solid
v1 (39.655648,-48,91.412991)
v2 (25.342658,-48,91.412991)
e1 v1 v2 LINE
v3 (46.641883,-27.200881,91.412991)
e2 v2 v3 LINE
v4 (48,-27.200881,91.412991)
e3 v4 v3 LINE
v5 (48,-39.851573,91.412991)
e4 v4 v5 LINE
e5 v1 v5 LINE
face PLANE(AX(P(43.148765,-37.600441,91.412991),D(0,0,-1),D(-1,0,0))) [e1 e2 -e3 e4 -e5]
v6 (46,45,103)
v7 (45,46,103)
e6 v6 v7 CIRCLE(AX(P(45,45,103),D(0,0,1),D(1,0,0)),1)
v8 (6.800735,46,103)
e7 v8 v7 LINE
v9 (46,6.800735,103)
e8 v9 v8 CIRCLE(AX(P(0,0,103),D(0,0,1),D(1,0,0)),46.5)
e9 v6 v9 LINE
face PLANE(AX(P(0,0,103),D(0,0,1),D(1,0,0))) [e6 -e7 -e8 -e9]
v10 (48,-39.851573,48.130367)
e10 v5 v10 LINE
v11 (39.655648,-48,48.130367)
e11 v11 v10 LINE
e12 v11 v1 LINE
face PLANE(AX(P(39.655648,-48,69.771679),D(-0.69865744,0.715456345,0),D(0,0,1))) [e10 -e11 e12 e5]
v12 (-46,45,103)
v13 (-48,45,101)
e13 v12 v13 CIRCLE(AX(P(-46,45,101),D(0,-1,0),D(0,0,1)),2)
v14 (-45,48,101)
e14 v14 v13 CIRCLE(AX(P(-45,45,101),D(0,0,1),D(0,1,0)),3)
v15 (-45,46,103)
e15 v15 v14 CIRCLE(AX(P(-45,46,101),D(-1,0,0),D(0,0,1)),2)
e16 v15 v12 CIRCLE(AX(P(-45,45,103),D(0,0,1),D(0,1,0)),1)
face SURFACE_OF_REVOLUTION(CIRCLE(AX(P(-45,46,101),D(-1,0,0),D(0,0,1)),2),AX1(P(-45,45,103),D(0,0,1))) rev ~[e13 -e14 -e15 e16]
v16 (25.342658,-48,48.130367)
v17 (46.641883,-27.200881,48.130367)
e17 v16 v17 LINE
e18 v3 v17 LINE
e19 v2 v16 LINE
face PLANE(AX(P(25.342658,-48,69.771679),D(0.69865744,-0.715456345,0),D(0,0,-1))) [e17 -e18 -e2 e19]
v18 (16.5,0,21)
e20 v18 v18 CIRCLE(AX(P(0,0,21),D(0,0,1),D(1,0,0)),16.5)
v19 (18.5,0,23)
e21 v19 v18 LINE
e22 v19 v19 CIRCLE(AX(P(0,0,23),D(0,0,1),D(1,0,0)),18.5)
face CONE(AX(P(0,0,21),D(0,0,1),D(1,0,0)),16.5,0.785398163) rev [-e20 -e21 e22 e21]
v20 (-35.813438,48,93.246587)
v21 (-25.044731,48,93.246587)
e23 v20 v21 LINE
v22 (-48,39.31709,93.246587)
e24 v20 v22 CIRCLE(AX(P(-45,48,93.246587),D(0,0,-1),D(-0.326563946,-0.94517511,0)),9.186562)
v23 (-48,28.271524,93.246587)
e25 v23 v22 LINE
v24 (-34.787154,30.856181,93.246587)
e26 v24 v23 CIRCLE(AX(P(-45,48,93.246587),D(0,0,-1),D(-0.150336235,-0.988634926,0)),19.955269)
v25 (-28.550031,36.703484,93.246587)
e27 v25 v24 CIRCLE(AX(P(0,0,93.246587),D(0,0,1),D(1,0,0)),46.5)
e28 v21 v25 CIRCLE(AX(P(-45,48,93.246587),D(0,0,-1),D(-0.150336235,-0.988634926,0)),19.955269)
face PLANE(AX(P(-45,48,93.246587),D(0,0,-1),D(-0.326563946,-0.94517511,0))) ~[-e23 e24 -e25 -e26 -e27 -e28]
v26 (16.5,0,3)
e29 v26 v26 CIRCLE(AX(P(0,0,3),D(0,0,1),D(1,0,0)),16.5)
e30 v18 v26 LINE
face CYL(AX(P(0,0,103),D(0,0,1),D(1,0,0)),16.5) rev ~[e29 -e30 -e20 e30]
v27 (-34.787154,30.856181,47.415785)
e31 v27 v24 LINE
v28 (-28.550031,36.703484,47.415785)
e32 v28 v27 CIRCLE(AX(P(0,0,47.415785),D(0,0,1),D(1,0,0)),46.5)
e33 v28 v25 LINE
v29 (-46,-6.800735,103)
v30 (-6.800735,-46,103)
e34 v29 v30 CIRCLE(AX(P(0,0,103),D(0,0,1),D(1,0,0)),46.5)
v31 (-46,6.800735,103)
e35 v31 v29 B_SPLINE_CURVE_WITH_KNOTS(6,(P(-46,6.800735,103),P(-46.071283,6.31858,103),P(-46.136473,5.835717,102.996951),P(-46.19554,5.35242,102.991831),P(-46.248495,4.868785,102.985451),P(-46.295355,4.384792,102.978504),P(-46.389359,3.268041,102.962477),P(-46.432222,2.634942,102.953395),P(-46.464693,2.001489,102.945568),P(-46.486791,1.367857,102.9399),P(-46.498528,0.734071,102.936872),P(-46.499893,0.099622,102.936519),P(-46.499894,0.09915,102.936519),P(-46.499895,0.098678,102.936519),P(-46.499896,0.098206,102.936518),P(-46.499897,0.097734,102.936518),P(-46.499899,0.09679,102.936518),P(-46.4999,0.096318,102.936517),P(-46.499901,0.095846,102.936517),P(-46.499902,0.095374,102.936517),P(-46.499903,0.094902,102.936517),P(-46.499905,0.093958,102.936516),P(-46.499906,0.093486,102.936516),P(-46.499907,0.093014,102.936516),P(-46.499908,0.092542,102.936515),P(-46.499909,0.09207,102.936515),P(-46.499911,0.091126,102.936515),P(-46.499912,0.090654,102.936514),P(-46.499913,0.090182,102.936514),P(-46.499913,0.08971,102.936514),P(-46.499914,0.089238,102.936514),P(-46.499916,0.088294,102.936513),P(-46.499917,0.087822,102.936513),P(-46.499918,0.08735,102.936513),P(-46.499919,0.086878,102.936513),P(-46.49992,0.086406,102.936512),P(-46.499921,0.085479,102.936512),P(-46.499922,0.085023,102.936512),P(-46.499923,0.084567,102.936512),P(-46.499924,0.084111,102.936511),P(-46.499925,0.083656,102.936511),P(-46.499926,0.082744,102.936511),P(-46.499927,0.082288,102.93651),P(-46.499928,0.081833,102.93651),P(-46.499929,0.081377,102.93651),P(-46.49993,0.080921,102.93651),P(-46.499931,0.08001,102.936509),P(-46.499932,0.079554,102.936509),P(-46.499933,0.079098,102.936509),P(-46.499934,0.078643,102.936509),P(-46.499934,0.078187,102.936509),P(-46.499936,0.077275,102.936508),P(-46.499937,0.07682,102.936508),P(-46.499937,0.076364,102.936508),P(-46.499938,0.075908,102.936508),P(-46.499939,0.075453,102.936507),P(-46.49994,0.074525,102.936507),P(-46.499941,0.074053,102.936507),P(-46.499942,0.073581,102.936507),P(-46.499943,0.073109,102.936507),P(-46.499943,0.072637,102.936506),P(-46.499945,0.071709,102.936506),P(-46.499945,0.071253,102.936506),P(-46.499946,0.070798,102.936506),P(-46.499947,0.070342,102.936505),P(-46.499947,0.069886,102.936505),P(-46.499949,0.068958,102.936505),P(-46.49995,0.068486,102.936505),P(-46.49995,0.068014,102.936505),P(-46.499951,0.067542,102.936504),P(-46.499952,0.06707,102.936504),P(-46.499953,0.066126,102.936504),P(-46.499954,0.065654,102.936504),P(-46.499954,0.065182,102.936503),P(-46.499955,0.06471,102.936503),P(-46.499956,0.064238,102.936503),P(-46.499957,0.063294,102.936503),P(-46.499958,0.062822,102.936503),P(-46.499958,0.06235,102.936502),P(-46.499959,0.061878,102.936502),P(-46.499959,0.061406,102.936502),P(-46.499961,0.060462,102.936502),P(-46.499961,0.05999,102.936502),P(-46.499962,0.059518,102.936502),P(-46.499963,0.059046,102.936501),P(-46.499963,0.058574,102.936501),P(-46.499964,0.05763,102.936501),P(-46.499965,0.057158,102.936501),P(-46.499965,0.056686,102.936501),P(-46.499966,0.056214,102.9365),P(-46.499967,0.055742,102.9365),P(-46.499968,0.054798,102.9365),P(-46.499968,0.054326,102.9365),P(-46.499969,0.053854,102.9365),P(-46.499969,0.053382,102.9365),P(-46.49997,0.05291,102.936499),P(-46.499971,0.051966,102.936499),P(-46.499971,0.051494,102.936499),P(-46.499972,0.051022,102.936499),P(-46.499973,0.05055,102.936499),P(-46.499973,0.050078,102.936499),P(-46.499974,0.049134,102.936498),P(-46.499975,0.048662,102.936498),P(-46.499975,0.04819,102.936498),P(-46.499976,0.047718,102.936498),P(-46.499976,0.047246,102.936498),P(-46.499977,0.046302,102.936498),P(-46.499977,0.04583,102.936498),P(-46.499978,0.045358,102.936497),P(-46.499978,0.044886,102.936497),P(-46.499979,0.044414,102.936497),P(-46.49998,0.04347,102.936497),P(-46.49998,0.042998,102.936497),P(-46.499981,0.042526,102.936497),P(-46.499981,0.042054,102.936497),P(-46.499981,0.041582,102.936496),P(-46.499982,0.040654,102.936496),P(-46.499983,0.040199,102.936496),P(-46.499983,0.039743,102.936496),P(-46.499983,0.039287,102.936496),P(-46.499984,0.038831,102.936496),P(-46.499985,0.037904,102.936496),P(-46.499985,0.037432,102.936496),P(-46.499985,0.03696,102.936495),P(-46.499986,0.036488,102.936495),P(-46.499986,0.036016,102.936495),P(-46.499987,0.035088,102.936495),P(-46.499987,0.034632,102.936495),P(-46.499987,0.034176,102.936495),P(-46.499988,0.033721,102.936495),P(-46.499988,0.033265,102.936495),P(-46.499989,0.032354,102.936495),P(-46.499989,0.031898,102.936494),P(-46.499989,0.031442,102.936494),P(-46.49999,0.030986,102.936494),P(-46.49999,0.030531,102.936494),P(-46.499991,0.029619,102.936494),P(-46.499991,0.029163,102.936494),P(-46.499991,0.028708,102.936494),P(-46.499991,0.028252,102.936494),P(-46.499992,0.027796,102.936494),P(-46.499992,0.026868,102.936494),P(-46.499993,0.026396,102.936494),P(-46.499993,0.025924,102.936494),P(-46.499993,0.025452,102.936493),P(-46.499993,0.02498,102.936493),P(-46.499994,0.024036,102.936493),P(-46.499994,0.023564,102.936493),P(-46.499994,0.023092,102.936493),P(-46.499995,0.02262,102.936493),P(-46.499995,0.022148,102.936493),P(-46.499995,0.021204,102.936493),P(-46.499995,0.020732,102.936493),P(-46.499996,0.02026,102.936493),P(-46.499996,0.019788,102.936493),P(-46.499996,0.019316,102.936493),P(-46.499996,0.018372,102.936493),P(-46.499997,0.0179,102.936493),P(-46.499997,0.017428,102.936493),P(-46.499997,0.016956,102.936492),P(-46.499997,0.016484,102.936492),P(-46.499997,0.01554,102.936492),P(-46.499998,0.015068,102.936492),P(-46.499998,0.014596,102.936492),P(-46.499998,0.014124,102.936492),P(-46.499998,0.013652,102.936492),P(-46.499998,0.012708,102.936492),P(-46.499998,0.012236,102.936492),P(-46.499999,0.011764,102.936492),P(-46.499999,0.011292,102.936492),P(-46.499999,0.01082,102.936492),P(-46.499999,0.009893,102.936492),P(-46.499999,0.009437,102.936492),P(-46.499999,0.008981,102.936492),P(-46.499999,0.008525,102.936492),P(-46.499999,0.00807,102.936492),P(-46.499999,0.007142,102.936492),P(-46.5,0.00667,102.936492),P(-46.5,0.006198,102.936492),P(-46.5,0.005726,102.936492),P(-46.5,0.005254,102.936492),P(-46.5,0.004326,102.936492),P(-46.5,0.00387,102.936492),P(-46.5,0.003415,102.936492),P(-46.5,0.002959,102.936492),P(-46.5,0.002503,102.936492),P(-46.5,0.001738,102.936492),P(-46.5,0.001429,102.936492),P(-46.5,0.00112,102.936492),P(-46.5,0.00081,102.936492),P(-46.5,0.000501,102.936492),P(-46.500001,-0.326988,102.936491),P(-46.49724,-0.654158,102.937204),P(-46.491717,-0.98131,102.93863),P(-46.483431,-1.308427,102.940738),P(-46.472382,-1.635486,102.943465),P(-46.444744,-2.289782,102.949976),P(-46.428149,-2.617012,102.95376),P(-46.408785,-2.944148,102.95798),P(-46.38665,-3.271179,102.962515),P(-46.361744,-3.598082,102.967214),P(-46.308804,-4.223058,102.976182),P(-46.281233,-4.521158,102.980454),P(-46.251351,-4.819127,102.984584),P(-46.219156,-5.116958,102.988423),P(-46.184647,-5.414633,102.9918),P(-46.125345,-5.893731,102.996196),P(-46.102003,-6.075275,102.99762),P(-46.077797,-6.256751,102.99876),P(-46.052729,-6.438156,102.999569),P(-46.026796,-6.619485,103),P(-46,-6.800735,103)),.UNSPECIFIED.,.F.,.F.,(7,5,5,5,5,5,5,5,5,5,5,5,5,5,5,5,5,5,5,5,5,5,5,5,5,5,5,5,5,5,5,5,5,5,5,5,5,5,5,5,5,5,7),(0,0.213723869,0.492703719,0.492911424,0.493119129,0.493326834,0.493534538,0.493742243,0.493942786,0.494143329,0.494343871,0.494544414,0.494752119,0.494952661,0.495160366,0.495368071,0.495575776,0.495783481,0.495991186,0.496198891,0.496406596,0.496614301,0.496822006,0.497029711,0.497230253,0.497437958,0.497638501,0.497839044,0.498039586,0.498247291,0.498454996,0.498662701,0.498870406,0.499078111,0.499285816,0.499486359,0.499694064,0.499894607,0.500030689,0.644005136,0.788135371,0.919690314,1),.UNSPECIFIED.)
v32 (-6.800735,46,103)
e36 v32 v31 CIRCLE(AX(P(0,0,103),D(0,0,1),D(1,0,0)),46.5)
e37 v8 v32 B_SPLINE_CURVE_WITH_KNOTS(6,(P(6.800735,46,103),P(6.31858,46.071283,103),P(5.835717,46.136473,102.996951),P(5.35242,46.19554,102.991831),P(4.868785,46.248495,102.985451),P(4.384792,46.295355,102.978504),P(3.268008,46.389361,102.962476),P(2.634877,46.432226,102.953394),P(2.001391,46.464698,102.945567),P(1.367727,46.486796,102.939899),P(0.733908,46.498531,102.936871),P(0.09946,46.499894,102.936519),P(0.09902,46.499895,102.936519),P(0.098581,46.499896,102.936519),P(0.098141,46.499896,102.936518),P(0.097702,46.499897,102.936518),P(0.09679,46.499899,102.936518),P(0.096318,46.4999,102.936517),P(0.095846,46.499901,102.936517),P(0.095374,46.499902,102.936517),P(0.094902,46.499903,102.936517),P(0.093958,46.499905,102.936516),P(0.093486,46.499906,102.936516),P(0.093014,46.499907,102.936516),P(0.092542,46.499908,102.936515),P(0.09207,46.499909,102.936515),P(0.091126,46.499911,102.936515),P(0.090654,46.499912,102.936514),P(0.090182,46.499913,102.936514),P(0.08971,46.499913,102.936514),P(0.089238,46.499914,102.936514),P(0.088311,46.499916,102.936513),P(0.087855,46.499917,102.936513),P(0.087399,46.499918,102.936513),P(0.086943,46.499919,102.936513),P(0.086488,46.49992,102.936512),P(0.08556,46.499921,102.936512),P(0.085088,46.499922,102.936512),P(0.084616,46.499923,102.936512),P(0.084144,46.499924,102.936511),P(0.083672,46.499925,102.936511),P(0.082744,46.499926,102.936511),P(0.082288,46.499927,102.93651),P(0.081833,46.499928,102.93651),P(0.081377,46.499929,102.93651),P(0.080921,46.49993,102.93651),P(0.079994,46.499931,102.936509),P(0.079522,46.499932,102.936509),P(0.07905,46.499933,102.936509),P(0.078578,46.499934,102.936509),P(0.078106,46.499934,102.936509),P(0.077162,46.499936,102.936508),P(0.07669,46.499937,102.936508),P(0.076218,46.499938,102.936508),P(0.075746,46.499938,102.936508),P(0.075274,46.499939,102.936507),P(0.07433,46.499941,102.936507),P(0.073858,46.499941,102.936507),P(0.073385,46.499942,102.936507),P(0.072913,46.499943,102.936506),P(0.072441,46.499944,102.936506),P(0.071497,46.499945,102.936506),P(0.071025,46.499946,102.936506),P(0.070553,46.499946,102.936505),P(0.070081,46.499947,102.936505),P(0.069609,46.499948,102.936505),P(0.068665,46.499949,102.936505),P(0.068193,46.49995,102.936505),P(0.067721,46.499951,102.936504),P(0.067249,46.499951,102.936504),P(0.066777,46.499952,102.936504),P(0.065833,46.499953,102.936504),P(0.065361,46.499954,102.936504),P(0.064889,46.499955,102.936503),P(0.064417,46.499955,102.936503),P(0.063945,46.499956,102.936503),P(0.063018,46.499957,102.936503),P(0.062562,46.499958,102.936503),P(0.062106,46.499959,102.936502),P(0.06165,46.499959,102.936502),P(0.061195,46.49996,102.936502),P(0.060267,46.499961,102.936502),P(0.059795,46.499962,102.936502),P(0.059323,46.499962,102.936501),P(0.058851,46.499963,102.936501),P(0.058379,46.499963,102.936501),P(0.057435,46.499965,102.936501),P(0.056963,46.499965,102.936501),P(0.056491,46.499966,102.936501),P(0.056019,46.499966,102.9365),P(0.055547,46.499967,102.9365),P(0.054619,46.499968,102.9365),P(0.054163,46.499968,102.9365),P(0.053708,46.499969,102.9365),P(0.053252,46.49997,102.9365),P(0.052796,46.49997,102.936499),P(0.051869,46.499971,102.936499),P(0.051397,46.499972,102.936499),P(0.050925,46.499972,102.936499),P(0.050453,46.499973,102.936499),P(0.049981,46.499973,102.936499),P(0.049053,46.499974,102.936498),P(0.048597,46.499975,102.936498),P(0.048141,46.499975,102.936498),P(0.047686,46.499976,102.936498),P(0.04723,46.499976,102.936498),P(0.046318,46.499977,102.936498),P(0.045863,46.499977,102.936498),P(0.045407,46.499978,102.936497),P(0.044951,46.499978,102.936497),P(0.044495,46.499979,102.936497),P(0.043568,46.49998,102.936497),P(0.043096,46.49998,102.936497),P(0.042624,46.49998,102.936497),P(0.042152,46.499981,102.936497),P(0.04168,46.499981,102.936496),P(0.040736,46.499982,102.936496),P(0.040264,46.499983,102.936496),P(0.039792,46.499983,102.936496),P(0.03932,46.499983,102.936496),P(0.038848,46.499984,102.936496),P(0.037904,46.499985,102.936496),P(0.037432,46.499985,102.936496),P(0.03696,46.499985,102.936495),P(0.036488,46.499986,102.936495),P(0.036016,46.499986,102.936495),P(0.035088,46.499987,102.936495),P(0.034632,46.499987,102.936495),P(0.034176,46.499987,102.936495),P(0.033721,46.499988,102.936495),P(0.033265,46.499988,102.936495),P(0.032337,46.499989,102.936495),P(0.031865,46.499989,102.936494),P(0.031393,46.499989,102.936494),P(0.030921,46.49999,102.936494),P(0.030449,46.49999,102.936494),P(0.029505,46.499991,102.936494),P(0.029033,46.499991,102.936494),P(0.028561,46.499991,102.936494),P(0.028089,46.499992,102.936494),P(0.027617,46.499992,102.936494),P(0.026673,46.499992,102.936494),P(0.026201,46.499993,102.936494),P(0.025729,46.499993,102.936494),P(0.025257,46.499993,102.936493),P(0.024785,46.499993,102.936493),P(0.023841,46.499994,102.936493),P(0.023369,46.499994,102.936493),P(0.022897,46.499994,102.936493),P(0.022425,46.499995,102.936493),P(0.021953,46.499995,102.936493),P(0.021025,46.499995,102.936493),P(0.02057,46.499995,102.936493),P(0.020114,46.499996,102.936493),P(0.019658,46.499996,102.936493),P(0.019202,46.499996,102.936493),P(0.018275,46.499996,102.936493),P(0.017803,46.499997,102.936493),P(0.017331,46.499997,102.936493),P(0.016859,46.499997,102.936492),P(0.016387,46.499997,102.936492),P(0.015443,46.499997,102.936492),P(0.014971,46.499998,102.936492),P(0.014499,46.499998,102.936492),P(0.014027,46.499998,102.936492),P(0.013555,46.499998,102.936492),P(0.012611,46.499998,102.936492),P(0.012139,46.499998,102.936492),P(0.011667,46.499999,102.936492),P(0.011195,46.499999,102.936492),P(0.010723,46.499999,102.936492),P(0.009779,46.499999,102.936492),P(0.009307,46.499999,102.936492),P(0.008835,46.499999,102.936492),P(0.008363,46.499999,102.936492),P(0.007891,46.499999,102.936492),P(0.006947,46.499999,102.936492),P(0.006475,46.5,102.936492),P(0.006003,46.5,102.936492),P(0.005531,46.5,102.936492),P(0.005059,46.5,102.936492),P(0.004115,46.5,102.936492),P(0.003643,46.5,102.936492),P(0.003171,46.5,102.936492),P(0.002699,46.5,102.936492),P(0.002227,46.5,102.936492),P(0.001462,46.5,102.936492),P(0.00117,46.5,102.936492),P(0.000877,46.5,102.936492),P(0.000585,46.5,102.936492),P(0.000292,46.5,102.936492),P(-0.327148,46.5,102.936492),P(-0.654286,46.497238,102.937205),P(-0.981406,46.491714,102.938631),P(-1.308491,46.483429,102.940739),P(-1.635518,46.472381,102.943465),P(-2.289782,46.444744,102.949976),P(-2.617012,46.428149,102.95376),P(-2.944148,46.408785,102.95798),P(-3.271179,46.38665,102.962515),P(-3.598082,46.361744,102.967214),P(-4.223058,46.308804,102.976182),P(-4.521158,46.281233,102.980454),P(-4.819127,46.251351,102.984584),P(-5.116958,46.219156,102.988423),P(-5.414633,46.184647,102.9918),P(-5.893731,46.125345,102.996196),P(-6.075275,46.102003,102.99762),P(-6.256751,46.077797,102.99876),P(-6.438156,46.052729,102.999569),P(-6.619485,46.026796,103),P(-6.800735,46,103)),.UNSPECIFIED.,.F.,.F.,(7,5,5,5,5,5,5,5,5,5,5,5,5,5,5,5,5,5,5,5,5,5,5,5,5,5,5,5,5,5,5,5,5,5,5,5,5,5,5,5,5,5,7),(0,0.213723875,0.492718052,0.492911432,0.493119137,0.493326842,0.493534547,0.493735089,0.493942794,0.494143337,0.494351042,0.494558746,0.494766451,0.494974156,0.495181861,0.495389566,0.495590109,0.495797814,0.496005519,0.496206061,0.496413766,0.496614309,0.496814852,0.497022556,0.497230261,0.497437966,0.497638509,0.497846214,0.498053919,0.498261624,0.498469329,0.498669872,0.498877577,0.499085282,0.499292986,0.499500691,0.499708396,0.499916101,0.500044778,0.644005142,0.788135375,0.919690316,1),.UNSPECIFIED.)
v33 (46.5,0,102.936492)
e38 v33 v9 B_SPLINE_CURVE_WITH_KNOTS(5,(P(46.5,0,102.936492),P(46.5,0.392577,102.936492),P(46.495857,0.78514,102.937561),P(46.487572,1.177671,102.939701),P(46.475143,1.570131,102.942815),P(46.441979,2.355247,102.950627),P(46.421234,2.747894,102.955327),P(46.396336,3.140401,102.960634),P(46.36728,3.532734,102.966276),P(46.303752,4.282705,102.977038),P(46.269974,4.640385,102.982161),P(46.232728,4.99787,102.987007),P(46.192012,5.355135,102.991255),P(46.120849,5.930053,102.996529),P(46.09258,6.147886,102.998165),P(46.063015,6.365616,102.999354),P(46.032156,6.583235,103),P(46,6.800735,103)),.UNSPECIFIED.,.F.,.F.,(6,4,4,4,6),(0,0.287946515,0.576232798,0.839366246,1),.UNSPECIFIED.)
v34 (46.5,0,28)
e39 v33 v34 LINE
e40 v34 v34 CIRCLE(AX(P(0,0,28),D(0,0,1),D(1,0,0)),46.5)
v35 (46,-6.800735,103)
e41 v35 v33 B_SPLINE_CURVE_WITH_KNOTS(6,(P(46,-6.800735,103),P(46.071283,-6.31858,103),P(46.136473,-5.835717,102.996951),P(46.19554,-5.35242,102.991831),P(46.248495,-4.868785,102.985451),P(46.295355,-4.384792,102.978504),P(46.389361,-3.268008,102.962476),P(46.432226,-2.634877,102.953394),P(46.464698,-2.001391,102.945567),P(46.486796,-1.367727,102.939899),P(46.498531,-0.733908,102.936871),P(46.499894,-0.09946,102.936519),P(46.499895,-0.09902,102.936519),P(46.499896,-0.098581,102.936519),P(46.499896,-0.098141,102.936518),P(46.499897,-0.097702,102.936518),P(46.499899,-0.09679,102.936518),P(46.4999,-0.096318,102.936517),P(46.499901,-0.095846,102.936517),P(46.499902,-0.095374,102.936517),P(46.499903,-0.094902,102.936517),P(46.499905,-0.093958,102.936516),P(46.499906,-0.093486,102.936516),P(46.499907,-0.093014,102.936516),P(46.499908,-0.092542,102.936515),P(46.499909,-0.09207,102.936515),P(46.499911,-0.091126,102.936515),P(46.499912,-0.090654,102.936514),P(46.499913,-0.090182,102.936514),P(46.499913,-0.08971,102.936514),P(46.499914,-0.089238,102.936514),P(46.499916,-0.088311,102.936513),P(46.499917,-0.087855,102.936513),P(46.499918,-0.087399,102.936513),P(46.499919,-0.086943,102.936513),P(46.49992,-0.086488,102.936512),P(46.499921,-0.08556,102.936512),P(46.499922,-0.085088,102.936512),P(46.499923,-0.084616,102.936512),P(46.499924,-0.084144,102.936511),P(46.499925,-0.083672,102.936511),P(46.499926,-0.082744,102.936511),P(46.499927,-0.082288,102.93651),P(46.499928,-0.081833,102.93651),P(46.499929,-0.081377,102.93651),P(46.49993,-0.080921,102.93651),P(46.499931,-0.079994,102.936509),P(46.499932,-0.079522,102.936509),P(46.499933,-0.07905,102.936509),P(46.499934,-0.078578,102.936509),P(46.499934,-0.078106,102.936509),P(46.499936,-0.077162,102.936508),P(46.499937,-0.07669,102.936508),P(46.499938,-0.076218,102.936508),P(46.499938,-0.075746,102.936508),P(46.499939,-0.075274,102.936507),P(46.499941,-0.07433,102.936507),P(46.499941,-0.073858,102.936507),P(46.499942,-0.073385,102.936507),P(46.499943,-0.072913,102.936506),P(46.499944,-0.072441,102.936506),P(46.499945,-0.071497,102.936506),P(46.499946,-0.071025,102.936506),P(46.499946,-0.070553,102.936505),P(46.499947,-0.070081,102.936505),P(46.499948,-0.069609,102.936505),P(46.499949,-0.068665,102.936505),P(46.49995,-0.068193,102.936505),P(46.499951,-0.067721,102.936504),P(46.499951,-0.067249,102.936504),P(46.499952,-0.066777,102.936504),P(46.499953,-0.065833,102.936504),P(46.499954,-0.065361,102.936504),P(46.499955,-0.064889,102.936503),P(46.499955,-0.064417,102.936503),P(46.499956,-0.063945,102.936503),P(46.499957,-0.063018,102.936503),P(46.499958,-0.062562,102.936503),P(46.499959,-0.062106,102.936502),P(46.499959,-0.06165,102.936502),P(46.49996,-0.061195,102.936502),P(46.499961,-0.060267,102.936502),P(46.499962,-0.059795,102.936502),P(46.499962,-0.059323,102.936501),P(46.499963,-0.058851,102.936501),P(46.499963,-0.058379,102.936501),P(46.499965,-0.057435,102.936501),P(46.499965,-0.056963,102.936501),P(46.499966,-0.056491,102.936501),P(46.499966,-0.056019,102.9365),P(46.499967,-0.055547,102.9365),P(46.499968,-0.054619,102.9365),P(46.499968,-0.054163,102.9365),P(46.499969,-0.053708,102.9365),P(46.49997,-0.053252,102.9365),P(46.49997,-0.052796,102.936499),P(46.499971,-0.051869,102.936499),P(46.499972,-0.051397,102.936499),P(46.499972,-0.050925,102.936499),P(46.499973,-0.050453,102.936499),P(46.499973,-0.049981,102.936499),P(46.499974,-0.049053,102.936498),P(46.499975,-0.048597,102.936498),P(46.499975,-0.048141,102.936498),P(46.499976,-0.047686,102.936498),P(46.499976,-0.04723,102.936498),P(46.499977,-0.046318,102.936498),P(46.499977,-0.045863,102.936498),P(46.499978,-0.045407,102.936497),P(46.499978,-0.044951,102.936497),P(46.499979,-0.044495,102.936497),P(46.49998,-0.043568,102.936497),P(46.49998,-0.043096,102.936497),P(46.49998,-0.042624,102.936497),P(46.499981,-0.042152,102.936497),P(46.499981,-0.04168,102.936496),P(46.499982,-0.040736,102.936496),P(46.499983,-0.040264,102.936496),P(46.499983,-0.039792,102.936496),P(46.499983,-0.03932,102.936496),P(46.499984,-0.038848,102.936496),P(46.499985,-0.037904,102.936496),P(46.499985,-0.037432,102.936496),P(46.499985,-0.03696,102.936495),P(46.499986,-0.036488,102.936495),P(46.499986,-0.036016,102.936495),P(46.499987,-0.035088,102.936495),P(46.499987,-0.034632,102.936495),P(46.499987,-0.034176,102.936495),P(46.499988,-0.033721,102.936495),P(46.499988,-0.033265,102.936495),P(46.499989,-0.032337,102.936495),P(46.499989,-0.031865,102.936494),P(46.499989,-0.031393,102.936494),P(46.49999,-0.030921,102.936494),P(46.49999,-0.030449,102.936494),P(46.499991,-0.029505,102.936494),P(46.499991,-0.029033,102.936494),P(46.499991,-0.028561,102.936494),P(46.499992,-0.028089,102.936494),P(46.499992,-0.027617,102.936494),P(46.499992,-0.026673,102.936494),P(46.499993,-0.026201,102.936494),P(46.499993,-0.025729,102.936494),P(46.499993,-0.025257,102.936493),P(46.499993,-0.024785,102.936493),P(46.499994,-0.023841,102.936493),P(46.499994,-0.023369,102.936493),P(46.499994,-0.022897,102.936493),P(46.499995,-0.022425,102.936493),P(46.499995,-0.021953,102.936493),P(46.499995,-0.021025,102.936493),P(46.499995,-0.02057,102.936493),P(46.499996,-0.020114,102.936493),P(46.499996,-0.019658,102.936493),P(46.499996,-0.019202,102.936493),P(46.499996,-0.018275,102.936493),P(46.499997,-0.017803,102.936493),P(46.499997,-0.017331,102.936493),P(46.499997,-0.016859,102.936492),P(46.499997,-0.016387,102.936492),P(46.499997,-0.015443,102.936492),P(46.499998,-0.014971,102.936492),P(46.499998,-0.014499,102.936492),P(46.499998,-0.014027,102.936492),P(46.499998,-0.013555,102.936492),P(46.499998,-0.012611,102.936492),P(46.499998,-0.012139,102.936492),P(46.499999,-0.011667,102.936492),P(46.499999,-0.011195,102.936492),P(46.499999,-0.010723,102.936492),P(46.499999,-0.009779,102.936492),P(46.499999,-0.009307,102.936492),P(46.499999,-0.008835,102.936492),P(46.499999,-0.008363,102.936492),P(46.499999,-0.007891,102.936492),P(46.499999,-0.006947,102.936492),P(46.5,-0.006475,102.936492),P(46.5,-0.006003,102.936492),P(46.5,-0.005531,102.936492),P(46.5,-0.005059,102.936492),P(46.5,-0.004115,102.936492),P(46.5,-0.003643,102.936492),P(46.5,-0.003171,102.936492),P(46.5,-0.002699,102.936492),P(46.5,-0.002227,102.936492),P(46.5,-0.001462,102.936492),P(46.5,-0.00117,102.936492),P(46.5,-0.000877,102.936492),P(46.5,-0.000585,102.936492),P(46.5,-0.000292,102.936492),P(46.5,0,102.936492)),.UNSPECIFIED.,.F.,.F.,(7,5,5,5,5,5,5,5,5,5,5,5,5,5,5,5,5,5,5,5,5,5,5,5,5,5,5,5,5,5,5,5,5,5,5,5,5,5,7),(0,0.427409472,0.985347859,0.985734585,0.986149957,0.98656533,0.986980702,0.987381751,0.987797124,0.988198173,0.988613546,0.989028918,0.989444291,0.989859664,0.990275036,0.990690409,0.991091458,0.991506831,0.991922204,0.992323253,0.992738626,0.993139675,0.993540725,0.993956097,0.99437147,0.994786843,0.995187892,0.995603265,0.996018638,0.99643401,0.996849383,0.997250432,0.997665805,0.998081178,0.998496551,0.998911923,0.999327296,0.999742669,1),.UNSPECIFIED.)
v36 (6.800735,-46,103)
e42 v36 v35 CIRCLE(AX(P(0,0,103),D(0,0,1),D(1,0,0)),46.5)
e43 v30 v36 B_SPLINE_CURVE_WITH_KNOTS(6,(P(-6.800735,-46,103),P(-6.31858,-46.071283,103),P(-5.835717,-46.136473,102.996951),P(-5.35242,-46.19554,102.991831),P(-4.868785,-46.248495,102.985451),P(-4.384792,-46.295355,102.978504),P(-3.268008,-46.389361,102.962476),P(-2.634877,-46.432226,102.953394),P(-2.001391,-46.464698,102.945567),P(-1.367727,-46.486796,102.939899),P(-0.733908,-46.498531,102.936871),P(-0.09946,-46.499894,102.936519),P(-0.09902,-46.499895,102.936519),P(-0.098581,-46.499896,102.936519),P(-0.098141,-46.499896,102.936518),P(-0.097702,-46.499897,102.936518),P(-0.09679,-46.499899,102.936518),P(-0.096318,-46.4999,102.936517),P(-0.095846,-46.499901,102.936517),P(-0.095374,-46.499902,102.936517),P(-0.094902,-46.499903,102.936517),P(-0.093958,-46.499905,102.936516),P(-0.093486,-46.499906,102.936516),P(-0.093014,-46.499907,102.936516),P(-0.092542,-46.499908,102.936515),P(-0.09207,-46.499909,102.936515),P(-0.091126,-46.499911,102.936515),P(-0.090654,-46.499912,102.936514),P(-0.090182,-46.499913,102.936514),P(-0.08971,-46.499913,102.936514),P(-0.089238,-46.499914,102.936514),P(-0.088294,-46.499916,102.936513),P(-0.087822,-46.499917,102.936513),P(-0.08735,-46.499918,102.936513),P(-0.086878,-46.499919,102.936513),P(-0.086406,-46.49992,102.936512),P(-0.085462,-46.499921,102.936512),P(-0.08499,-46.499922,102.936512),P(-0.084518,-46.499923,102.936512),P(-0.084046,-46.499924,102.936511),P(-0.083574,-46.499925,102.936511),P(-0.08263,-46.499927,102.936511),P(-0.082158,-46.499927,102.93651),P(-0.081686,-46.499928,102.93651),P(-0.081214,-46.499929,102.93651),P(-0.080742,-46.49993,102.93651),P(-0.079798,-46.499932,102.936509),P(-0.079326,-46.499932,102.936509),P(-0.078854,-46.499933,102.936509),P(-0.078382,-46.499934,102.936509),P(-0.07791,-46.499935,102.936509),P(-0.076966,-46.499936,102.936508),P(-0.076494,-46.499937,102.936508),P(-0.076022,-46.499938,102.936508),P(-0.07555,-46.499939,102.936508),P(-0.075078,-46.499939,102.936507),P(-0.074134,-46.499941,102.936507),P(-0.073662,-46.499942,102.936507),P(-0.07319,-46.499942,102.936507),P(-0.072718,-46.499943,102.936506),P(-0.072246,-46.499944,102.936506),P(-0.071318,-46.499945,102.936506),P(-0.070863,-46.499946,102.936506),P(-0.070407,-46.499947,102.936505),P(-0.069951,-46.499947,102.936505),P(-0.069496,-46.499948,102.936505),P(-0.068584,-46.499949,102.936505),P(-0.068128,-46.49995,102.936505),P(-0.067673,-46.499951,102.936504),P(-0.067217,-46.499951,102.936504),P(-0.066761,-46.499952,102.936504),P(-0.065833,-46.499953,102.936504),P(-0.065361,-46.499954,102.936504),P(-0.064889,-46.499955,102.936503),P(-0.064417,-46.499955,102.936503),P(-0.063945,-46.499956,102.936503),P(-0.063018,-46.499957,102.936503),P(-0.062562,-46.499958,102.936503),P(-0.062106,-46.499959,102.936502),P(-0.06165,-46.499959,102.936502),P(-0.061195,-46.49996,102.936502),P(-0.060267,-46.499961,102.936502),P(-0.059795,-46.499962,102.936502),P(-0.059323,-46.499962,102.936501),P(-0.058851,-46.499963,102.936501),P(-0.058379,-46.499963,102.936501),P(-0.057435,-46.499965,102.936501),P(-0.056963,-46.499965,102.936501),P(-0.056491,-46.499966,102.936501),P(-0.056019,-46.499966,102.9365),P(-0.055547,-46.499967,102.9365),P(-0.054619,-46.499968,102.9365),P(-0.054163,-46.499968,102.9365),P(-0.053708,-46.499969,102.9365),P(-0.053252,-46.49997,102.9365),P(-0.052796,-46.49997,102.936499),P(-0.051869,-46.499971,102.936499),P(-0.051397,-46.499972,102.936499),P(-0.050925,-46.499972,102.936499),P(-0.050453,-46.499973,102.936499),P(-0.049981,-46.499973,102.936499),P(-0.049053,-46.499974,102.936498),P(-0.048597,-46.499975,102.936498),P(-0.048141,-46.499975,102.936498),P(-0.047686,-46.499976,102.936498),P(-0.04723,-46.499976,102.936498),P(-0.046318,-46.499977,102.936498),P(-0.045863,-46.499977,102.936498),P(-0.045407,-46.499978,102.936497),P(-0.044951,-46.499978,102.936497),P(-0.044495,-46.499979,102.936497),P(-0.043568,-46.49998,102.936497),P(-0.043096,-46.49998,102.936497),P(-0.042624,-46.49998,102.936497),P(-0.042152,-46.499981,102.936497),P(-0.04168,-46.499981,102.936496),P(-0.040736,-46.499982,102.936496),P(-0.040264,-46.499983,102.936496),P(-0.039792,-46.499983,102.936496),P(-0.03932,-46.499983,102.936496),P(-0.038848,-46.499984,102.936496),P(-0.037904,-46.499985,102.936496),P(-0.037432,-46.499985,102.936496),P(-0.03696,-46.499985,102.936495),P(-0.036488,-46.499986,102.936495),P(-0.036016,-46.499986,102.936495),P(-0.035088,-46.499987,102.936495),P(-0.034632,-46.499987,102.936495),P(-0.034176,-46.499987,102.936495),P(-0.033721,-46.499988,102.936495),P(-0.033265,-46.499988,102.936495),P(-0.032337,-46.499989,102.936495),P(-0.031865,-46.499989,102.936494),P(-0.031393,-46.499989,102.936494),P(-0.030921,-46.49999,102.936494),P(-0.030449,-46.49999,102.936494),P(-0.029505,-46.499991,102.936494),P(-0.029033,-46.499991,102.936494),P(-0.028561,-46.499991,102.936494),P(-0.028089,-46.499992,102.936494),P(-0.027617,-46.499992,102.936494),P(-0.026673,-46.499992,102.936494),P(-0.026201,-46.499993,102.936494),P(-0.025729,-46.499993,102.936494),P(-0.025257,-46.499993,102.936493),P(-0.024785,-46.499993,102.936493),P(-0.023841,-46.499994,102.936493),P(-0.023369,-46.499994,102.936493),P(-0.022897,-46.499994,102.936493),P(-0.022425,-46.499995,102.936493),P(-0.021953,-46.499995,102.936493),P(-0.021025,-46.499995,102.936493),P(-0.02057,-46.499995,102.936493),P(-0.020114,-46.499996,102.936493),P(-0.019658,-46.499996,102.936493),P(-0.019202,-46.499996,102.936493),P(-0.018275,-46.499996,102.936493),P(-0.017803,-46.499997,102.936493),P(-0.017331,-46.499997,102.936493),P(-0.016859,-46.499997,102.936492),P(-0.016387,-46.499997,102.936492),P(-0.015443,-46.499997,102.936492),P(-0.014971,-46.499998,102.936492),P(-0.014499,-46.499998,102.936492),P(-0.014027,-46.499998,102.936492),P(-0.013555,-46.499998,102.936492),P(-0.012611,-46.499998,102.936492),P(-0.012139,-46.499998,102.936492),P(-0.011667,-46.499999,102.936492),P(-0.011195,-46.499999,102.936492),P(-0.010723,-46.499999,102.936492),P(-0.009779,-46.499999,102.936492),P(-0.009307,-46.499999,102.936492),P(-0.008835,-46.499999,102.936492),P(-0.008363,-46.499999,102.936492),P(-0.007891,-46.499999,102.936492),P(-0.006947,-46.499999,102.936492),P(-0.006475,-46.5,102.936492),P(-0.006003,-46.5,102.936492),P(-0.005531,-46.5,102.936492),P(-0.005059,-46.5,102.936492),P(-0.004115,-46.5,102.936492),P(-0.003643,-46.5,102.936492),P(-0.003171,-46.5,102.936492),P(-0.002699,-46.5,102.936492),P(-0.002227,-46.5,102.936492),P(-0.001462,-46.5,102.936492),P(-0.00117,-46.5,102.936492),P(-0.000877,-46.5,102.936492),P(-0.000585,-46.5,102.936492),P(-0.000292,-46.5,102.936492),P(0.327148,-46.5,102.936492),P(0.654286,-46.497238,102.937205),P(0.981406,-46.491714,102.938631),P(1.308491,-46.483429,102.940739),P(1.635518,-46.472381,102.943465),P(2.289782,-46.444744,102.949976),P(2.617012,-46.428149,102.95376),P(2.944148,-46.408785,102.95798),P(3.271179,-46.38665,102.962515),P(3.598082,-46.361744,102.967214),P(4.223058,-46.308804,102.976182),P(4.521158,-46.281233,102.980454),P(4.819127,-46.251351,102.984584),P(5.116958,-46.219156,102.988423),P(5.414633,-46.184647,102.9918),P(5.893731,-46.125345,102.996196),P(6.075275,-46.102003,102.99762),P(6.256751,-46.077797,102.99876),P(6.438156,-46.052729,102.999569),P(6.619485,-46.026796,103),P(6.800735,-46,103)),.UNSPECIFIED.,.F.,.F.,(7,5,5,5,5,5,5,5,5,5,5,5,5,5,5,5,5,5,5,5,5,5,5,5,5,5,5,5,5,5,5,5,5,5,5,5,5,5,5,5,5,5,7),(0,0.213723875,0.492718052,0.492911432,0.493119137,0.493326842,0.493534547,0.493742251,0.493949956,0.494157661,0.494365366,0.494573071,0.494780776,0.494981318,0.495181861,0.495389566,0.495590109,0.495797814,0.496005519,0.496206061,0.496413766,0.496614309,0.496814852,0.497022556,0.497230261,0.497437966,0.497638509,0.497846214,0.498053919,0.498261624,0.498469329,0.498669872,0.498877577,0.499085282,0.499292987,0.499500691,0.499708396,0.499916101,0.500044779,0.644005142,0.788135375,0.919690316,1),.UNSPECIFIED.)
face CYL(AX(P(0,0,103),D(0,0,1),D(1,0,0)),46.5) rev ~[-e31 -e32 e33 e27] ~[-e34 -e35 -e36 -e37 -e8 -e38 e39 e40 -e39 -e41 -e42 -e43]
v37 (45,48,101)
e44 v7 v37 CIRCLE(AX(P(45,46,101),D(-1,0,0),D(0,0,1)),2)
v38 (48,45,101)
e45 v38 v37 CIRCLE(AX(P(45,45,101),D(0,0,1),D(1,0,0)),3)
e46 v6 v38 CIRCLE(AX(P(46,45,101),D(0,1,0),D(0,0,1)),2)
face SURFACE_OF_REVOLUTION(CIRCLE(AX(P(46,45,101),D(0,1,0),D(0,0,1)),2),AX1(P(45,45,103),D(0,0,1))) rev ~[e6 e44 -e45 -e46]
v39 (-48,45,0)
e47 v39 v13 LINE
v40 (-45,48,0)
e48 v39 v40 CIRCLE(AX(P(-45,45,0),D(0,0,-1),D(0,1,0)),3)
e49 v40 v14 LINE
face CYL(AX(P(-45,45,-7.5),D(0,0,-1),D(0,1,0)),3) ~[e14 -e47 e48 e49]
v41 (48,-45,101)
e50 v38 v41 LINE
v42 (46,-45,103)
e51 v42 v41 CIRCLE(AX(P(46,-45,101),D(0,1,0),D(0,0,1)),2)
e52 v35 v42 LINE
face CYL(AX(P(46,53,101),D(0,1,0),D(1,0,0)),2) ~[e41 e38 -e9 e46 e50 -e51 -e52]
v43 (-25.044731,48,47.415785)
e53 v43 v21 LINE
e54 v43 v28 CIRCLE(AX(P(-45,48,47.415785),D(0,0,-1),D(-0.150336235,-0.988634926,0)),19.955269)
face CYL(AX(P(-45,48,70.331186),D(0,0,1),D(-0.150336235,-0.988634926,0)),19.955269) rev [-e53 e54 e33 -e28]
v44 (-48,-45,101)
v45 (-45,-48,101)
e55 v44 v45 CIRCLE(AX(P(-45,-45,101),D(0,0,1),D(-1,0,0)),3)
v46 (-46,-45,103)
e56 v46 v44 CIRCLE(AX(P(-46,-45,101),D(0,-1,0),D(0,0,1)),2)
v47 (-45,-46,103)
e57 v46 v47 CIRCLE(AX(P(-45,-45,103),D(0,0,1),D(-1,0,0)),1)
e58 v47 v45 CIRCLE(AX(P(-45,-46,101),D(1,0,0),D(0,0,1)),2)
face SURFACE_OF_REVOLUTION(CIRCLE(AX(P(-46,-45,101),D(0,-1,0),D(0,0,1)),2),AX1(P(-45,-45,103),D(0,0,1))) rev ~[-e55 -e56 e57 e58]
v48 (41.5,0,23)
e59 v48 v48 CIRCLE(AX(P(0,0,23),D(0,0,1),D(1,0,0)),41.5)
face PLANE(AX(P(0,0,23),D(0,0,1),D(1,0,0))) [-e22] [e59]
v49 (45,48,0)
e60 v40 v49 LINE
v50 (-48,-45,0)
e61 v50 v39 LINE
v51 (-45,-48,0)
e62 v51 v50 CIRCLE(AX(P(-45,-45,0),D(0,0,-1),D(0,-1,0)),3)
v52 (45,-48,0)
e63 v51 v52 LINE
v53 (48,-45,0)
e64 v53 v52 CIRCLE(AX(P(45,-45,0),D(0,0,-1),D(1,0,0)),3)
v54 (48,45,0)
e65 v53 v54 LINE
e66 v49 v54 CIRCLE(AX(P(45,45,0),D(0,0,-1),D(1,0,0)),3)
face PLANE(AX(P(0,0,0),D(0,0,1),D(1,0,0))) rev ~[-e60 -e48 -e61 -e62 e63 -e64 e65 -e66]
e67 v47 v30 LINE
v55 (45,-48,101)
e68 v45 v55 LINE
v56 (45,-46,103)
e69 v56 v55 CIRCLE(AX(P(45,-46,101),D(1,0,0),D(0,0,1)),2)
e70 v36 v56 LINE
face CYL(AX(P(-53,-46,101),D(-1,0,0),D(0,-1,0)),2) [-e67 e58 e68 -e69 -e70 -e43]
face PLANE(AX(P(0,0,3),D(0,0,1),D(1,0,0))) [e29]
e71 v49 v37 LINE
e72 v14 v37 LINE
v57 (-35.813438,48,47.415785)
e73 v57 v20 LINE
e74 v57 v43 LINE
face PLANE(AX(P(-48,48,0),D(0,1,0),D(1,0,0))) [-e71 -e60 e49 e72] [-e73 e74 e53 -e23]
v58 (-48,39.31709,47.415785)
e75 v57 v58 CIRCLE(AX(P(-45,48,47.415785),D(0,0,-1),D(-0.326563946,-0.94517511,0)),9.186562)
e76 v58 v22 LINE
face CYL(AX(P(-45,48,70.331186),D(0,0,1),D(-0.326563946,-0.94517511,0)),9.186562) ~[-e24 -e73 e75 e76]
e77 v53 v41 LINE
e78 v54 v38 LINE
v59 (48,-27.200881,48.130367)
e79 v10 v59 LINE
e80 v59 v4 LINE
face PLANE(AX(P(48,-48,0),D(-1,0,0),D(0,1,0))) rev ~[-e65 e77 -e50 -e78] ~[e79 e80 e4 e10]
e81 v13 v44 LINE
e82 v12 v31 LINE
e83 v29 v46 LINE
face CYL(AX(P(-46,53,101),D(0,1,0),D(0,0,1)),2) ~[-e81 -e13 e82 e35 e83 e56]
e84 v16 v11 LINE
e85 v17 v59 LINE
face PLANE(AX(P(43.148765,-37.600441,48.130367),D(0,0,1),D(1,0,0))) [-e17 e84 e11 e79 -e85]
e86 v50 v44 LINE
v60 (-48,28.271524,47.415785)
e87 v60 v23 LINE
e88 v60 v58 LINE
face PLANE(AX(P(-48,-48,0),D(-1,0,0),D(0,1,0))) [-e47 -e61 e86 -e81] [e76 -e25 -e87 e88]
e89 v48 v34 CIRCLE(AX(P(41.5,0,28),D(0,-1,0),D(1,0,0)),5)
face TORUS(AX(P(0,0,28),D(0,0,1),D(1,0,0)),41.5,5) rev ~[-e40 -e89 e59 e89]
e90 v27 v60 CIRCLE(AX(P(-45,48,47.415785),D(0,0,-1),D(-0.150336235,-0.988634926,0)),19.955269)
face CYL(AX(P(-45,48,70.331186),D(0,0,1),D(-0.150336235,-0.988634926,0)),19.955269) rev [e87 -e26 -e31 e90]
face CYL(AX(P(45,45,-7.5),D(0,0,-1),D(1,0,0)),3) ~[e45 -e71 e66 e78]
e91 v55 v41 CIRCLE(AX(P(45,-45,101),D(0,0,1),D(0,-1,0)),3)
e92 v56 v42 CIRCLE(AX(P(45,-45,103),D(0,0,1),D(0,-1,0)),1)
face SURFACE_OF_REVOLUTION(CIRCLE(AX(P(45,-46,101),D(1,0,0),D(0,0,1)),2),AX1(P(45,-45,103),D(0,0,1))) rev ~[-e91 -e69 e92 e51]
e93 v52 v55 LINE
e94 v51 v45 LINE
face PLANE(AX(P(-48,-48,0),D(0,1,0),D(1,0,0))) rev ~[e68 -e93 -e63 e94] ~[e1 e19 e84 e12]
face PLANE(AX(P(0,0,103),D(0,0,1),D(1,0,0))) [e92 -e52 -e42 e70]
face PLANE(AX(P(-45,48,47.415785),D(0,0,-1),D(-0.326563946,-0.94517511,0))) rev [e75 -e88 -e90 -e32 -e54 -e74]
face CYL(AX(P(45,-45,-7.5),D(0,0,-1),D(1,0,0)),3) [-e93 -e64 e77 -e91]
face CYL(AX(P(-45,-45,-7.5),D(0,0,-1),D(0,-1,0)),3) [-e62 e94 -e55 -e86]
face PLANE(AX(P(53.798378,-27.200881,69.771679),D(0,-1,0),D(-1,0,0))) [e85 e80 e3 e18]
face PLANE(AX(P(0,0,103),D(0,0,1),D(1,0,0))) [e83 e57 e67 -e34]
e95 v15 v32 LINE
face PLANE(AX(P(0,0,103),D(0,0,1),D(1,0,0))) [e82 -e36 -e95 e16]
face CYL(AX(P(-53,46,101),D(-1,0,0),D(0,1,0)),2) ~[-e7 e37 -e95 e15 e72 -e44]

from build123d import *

# Parameters (mm, degrees)
F0_W         = 96
F0_H         = 96
F1_DEPTH     = 103
F2_R         = 16.5
F3_DEPTH     = 100
F4_R         = 46.5
F5_DEPTH     = 80
F6_T1_DEPTH  = 106
F6_T3_DEPTH  = 106
F7_T1_DEPTH  = 110.4999999999
F7_T4_ANGLE  = 90
F7_T6_ANGLE  = 90
F7_T8_ANGLE  = 90
F7_T10_ANGLE = 90
F9_SIZE      = 2
F8_W         = 14.3129900098
F8_H         = 43.2826243341
F12_R        = 5
F13_W        = 11.0455658287
F13_H        = 45.8308011293


# Not quite as in the source:
# - a fillet or chamfer that OpenCascade refuses, or shapes differently, is made with other operations: its cross-section is extruded or revolved along the edge and cut away or added


with BuildPart() as f1:
    # F0 (on Top) → F1 (new body)
    with BuildSketch(Plane.XY):
        Rectangle(F0_W, F0_H)
    extrude(amount=F1_DEPTH)

    # F2 (on face) → F3 (cut)
    with BuildSketch(Plane.XY.offset(103)):
        Circle(F2_R)
    extrude(amount=-F3_DEPTH, mode=Mode.SUBTRACT)

    # F4 (on face) → F5 (cut)
    with BuildSketch(Plane.XY.offset(103)):
        Circle(F4_R)
    extrude(amount=-F5_DEPTH, mode=Mode.SUBTRACT)

    # F6: fillet of radius 2 on 4 edges, made by hand

    # F6_s2 → F6_t1 (cut)
    with BuildSketch(Plane.YZ.offset(-53)):
        with BuildLine():
            ThreePointArc((48, 101), (47.4142135624, 102.4142135624), (46, 103))
            Line((46, 103), (48, 103))
            Line((48, 103), (48, 101))
        make_face()
        with BuildLine():
            ThreePointArc((-48, 101), (-47.4142135624, 102.4142135624), (-46, 103))
            Line((-46, 103), (-48, 103))
            Line((-48, 103), (-48, 101))
        make_face()
    extrude(amount=F6_T1_DEPTH, mode=Mode.SUBTRACT)

    # F6_s4 → F6_t3 (cut)
    with BuildSketch(Plane.XZ.offset(-53)):
        with BuildLine():
            ThreePointArc((48, 101), (47.4142135624, 102.4142135624), (46, 103))
            Line((46, 103), (48, 103))
            Line((48, 103), (48, 101))
        make_face()
        with BuildLine():
            ThreePointArc((-46, 103), (-47.4142135624, 102.4142135624), (-48, 101))
            Line((-48, 101), (-48, 103))
            Line((-48, 103), (-46, 103))
        make_face()
    extrude(amount=F6_T3_DEPTH, mode=Mode.SUBTRACT)

    # F7: fillet of radius 3 on 4 edges, made by hand

    # F7_s2 → F7_t1 (cut)
    with BuildSketch(Plane.XY.offset(-7.5)):
        with BuildLine():
            ThreePointArc((48, -45), (47.1213203436, -47.1213203436), (45, -48))
            Line((45, -48), (48, -48))
            Line((48, -48), (48, -45))
        make_face()
        with BuildLine():
            ThreePointArc((-45, -48), (-47.1213203436, -47.1213203436), (-48, -45))
            Line((-48, -45), (-48, -48))
            Line((-48, -48), (-45, -48))
        make_face()
        with BuildLine():
            ThreePointArc((-45, 48), (-47.1213203436, 47.1213203436), (-48, 45))
            Line((-48, 45), (-48, 48))
            Line((-48, 48), (-45, 48))
        make_face()
        with BuildLine():
            ThreePointArc((48, 45), (47.1213203436, 47.1213203436), (45, 48))
            Line((45, 48), (48, 48))
            Line((48, 48), (48, 45))
        make_face()
    extrude(amount=F7_T1_DEPTH, mode=Mode.SUBTRACT)

    # F7_s3 → F7_t4 (revolve, cut)
    with BuildSketch(Plane.XZ.offset(-45)):
        with BuildLine():
            ThreePointArc((46.0000000001, 103), (47.4142135624, 102.4142135624), (48, 101.0000000001))
            Line((48, 101.0000000001), (48, 103))
            Line((48, 103), (46.0000000001, 103))
        make_face()
    revolve(axis=Axis((45, 45, 103), (0, 0, 1)), revolution_arc=F7_T4_ANGLE, mode=Mode.SUBTRACT)

    # F7_s5 → F7_t6 (revolve, cut)
    with BuildSketch(Plane.YZ.offset(-45)):
        with BuildLine():
            ThreePointArc((46.0000000001, 103), (47.4142135624, 102.4142135624), (48, 101.0000000001))
            Line((48, 101.0000000001), (48, 103))
            Line((48, 103), (46.0000000001, 103))
        make_face()
    revolve(axis=Axis((-45, 45, 103), (0, 0, 1)), revolution_arc=F7_T6_ANGLE, mode=Mode.SUBTRACT)

    # F7_s7 → F7_t8 (revolve, cut)
    with BuildSketch(Plane.XZ.offset(45)):
        with BuildLine():
            ThreePointArc((-46.0000000001, 103), (-47.4142135624, 102.4142135624), (-48, 101.0000000001))
            Line((-48, 101.0000000001), (-48, 103))
            Line((-48, 103), (-46.0000000001, 103))
        make_face()
    revolve(axis=Axis((-45, -45, 103), (0, 0, 1)), revolution_arc=F7_T8_ANGLE, mode=Mode.SUBTRACT)

    # F7_s9 → F7_t10 (revolve, cut)
    with BuildSketch(Plane.YZ.offset(45)):
        with BuildLine():
            ThreePointArc((-46.0000000001, 103), (-47.4142135624, 102.4142135624), (-48, 101.0000000001))
            Line((-48, 101.0000000001), (-48, 103))
            Line((-48, 103), (-46.0000000001, 103))
        make_face()
    revolve(axis=Axis((45, -45, 103), (0, 0, 1)), revolution_arc=F7_T10_ANGLE, mode=Mode.SUBTRACT)

    # F9
    f9_edges = [f1.edges().sort_by_distance(p)[0] for p in [
        (-16.5, 0, 23),
    ]]
    chamfer(f9_edges, length=F9_SIZE)

    # F11: sweep along a path in F10
    with BuildLine(Plane.XY.offset(23)) as f11_path:
        Line((27.1213203436, -47.9204392359), (48.4205447137, -27.1213203436))
    # F8 (on face) → F11 (sweep, cut)
    with BuildSketch(Plane.XZ.offset(48)):
        with Locations((32.499153167, 69.7716791183)):
            Rectangle(F8_W, F8_H)
    sweep(path=f11_path.line, mode=Mode.SUBTRACT)

    # F12
    f12_edges = [f1.edges().sort_by_distance(p)[0] for p in [
        (-46.5, 0, 23),
    ]]
    fillet(f12_edges, radius=F12_R)

    # F13 (on face) → F14 (revolve, cut)
    with BuildSketch(Plane(origin=(-48, 0, 0), x_dir=(0, -1, 0), z_dir=(-1, 0, 0))):
        with Locations((-33.7943071499, 70.3311860561)):
            Rectangle(F13_W, F13_H)
    revolve(axis=Axis((-45, 48, 50.5), (0, 0, -1)), mode=Mode.SUBTRACT)


solid = f1.part
